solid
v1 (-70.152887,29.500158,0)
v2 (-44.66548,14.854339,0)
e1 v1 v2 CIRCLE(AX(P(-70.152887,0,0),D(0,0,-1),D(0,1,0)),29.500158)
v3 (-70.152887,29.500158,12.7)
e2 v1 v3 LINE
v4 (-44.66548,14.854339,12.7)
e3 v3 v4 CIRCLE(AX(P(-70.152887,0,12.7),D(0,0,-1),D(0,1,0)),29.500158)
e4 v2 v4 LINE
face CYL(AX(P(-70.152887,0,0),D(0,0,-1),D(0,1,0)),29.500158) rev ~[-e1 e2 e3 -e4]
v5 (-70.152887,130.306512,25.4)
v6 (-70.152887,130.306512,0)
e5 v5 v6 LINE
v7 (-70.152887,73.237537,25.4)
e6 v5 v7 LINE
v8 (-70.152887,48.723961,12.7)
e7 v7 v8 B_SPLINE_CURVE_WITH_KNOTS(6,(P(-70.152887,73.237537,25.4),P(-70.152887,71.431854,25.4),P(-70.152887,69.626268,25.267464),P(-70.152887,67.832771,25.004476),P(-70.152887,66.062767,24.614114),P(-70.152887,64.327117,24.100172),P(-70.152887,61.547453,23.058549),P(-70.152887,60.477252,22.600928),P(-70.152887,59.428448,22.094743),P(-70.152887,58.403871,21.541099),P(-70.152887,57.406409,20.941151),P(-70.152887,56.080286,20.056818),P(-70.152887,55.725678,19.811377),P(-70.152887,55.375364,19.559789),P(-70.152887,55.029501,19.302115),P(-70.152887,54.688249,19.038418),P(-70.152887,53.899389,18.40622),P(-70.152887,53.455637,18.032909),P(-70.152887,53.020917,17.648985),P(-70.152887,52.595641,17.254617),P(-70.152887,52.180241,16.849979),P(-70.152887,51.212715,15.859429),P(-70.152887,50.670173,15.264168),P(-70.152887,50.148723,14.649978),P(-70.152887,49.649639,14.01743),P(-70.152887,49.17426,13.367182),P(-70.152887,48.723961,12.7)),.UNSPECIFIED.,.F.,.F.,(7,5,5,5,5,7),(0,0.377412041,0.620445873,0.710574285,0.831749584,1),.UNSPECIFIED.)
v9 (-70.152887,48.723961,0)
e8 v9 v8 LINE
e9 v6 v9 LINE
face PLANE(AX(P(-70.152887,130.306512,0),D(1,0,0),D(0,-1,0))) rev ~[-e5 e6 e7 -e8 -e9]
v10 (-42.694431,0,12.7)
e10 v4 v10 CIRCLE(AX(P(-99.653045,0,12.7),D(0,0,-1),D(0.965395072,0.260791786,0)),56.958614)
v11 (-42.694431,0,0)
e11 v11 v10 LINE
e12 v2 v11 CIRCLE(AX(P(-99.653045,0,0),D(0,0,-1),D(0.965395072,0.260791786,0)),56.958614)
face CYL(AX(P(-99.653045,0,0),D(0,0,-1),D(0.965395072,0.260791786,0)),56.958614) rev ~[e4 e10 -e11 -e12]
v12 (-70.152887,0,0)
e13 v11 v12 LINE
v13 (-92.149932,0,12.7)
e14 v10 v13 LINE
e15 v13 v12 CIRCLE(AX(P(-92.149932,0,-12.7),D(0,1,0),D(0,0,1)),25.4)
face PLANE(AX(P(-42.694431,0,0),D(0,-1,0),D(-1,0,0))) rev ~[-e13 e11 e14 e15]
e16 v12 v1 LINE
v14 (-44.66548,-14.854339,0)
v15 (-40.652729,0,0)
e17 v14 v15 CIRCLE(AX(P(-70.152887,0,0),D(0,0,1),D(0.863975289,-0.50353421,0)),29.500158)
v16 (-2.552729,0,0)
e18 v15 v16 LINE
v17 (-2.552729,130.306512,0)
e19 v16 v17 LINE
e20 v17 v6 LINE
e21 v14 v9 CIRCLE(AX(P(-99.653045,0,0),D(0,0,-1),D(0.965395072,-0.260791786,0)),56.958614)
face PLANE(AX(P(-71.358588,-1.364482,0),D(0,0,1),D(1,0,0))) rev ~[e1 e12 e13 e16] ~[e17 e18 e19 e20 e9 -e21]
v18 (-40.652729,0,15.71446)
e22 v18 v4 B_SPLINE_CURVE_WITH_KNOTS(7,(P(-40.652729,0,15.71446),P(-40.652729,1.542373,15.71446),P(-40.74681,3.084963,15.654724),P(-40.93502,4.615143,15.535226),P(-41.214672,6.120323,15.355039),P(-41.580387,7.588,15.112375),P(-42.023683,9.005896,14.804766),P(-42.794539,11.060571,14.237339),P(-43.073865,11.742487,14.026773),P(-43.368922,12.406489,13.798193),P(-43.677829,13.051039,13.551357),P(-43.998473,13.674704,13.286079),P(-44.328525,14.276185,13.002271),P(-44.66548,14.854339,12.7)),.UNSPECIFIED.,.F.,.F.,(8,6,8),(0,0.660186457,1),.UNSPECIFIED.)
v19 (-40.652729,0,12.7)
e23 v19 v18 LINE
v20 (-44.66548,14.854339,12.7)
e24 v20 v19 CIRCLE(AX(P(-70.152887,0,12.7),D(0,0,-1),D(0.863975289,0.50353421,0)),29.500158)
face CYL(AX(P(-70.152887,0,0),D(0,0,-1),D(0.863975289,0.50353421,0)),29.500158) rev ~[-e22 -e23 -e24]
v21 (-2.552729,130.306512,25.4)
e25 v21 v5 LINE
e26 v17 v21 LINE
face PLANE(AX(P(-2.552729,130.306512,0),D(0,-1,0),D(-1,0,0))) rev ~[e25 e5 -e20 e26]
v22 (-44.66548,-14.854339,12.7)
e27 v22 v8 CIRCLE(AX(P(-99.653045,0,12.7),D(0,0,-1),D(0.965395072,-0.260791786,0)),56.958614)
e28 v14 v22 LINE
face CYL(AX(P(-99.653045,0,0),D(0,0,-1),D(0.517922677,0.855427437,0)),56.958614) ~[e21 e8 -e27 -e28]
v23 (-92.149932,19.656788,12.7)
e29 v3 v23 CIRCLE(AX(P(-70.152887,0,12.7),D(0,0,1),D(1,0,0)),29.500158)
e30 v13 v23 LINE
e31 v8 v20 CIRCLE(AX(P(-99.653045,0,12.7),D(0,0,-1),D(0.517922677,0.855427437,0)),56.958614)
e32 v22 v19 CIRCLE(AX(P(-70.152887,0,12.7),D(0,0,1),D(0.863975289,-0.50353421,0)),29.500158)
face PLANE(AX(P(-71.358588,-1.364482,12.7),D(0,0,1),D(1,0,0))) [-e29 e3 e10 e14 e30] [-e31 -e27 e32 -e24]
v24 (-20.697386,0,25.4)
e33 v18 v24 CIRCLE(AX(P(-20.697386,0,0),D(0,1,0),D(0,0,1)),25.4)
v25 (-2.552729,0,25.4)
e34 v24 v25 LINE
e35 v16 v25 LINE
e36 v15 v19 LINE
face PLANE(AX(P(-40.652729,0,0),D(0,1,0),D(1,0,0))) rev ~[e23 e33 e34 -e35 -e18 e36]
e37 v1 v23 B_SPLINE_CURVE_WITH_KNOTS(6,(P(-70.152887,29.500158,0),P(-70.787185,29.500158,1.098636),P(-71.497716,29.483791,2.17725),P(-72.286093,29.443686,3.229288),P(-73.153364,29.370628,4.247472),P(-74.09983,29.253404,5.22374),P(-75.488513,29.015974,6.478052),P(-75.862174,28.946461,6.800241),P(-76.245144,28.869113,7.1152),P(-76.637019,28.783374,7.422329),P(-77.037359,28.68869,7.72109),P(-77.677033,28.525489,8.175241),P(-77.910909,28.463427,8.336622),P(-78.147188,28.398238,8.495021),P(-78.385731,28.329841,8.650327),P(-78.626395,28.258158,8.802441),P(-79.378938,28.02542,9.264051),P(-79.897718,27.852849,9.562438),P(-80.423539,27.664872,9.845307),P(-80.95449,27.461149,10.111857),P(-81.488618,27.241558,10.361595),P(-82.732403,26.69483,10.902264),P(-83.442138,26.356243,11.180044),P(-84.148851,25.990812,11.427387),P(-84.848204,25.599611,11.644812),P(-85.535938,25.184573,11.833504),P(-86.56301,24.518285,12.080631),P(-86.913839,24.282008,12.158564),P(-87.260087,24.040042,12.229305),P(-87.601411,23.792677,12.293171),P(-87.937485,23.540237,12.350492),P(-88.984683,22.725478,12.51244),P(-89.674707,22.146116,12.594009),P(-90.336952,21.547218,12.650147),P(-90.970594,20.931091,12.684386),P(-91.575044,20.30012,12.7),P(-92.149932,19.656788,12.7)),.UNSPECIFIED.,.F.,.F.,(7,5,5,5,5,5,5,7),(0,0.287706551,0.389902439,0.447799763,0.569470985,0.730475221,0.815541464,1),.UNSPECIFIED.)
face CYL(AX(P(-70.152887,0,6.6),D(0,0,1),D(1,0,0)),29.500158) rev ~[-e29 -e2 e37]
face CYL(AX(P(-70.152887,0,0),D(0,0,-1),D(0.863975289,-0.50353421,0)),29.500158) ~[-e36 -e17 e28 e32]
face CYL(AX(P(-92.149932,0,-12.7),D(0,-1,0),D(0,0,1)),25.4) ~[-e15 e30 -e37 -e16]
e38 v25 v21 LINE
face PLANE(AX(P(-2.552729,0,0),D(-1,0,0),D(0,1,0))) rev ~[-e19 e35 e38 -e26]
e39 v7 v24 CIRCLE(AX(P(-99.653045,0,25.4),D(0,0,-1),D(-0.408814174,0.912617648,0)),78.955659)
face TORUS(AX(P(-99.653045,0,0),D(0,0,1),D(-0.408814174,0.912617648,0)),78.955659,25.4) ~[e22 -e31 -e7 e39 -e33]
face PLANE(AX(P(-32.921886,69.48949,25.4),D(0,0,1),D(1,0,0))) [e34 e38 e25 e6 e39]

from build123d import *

# Parameters (mm, degrees)
F1_DEPTH     = 25.4
F2_DEPTH     = 12.7
F3_T4_DEPTH  = 139.4853841596
F3_S5_R      = 56.9586140596
F3_T6_DEPTH  = 72
F3_T11_DEPTH = 84.4927710193
F3_S12_R     = 29.500157879
F3_T13_DEPTH = 46
F3_T15_ANGLE = 154.3366921311


# Not quite as in the source:
# - a fillet or chamfer that OpenCascade refuses, or shapes differently, is made with other operations: its cross-section is extruded or revolved along the edge and cut away or added


with BuildPart() as f1:
    # F0 (on Top) → F1 (new body)
    with BuildSketch(Plane.XY):
        with BuildLine():
            ThreePointArc((-44.6654795557, 14.8543386834), (-41.6735799491, 7.6933988578), (-40.6527291, 0))
            Line((-40.6527291, 0), (-2.5527291, 0))
            Line((-2.5527291, 0), (-2.5527291, 130.3065121174))
            Line((-2.5527291, 130.3065121174), (-70.1528869789, 130.3065121174))
            Line((-70.1528869789, 130.3065121174), (-70.1528869789, 48.7239612584))
            ThreePointArc((-70.1528869789, 48.7239612584), (-54.141159867, 34.2483874097), (-44.6654795557, 14.8543386834))
        make_face()
    extrude(amount=F1_DEPTH)

    # F0 (on Top) → F2 (join)
    with BuildSketch(Plane.XY):
        with BuildLine():
            Line((-42.6944307983, 0), (-70.1528869789, 0))
            Line((-70.1528869789, 0), (-70.1528869789, 29.500157879))
            ThreePointArc((-70.1528869789, 29.500157879), (-95.730852606, -14.6978566215), (-44.6654795557, -14.8543386834))
            ThreePointArc((-44.6654795557, -14.8543386834), (-43.1893431296, -7.4922695314), (-42.6944307983, 0))
        make_face()
        with BuildLine():
            ThreePointArc((-44.6654795557, 14.8543386834), (-43.1893431296, 7.4922695314), (-42.6944307983, 0))
            Line((-42.6944307983, 0), (-40.6527291, 0))
            ThreePointArc((-40.6527291, 0), (-41.6735799491, 7.6933988578), (-44.6654795557, 14.8543386834))
        make_face()
        with BuildLine():
            Line((-40.6527291, 0), (-42.6944307983, 0))
            ThreePointArc((-42.6944307983, 0), (-43.1893431296, -7.4922695314), (-44.6654795557, -14.8543386834))
            ThreePointArc((-44.6654795557, -14.8543386834), (-41.6735799491, -7.6933988578), (-40.6527291, 0))
        make_face()
        with BuildLine():
            ThreePointArc((-44.6654795557, -14.8543386834), (-95.730852606, -14.6978566215), (-70.1528869789, 29.500157879))
            Line((-70.1528869789, 29.500157879), (-70.1528869789, 48.7239612584))
            ThreePointArc((-70.1528869789, 48.7239612584), (-152.5216924476, -21.1940986511), (-44.6654795557, -14.8543386834))
        make_face()
        with BuildLine():
            Line((-70.1528869789, 48.7239612584), (-70.1528869789, 29.500157879))
            ThreePointArc((-70.1528869789, 29.500157879), (-55.4550303574, 25.577965627), (-44.6654795557, 14.8543386834))
            ThreePointArc((-44.6654795557, 14.8543386834), (-54.141159867, 34.2483874097), (-70.1528869789, 48.7239612584))
        make_face()
        with BuildLine():
            ThreePointArc((-44.6654795557, 14.8543386834), (-41.6735799491, 7.6933988578), (-40.6527291, 0))
            Line((-40.6527291, 0), (-2.5527291, 0))
            Line((-2.5527291, 0), (-2.5527291, 130.3065121174))
            Line((-2.5527291, 130.3065121174), (-70.1528869789, 130.3065121174))
            Line((-70.1528869789, 130.3065121174), (-70.1528869789, 48.7239612584))
            ThreePointArc((-70.1528869789, 48.7239612584), (-54.141159867, 34.2483874097), (-44.6654795557, 14.8543386834))
        make_face()
    extrude(amount=F2_DEPTH)

    # F3: fillet of radius 25.4 on 2 edges, made by hand


with BuildPart() as f3_tool2:
    # F3_s3 → F3_t4 (new body)
    with BuildSketch(Plane.XZ.offset(54.9926131403)):
        with BuildLine():
            ThreePointArc((-92.1499322351, 12.7), (-79.4499322351, 9.2970452561), (-70.1528869789, 0))
            Line((-70.1528869789, 0), (-69.7129460738, 0.254))
            ThreePointArc((-69.7129460738, 0.254), (-69.6448869789, 6.35), (-69.6448869789, 12.7))
            Line((-69.6448869789, 12.7), (-70.1528869789, 13.208))
            Line((-70.1528869789, 13.208), (-92.1499322351, 13.208))
            Line((-92.1499322351, 13.208), (-92.1499322351, 12.7))
        make_face()
    extrude(amount=-F3_T4_DEPTH)

    # F3_s5 → F3_t6 (cut, symmetric)
    with BuildSketch(Plane.XY.offset(6.6)):
        with Locations((-99.6530448579, 0)):
            Circle(F3_S5_R)
    extrude(amount=F3_T6_DEPTH, both=True, mode=Mode.SUBTRACT)

    split(bisect_by=Plane.XZ, keep=Keep.TOP)


with BuildPart() as f1_1:
    add(f1.part)

    # F3_t1: cut F3_tool2
    add(f3_tool2.part, mode=Mode.SUBTRACT)


with BuildPart() as f3_tool9:
    # F3_s10 → F3_t11 (new body)
    with BuildSketch(Plane.XZ):
        with BuildLine():
            ThreePointArc((-92.1499322351, 12.7), (-79.4499322351, 9.2970452561), (-70.1528869789, 0))
            Line((-70.1528869789, 0), (-69.7129460738, 0.254))
            ThreePointArc((-69.7129460738, 0.254), (-69.6448869789, 6.35), (-69.6448869789, 12.7))
            Line((-69.6448869789, 12.7), (-70.1528869789, 13.208))
            Line((-70.1528869789, 13.208), (-92.1499322351, 13.208))
            Line((-92.1499322351, 13.208), (-92.1499322351, 12.7))
        make_face()
    extrude(amount=-F3_T11_DEPTH)

    # F3_s12 → F3_t13 (intersect, symmetric)
    with BuildSketch(Plane.XY.offset(6.6)):
        with Locations((-70.1528869789, 0)):
            Circle(F3_S12_R)
    extrude(amount=F3_T13_DEPTH, both=True, mode=Mode.INTERSECT)


with BuildPart() as f1_2:
    add(f1_1.part)

    # F3_t8: cut F3_tool9
    add(f3_tool9.part, mode=Mode.SUBTRACT)

    # F3_s14 → F3_t15 (revolve, cut)
    with BuildSketch(Plane(origin=(-82.9981282802, -37.1796571073, 0), x_dir=(0, 0, 1), z_dir=(-0.912617648, -0.4088141736, 0))):
        with BuildLine():
            ThreePointArc((25.4, 119.695236496), (21.9970452561, 106.995236496), (12.7, 97.6981912399))
            Line((12.7, 97.6981912399), (12.954, 97.2582503348))
            ThreePointArc((12.954, 97.2582503348), (19.05, 97.1901912399), (25.4, 97.1901912399))
            Line((25.4, 97.1901912399), (25.908, 97.6981912399))
            Line((25.908, 97.6981912399), (25.908, 119.695236496))
            Line((25.908, 119.695236496), (25.4, 119.695236496))
        make_face()
    revolve(axis=Axis((-99.6530448579, 0, 25.4), (0, 0, -1)), revolution_arc=F3_T15_ANGLE, mode=Mode.SUBTRACT)


solid = f1_2.part
